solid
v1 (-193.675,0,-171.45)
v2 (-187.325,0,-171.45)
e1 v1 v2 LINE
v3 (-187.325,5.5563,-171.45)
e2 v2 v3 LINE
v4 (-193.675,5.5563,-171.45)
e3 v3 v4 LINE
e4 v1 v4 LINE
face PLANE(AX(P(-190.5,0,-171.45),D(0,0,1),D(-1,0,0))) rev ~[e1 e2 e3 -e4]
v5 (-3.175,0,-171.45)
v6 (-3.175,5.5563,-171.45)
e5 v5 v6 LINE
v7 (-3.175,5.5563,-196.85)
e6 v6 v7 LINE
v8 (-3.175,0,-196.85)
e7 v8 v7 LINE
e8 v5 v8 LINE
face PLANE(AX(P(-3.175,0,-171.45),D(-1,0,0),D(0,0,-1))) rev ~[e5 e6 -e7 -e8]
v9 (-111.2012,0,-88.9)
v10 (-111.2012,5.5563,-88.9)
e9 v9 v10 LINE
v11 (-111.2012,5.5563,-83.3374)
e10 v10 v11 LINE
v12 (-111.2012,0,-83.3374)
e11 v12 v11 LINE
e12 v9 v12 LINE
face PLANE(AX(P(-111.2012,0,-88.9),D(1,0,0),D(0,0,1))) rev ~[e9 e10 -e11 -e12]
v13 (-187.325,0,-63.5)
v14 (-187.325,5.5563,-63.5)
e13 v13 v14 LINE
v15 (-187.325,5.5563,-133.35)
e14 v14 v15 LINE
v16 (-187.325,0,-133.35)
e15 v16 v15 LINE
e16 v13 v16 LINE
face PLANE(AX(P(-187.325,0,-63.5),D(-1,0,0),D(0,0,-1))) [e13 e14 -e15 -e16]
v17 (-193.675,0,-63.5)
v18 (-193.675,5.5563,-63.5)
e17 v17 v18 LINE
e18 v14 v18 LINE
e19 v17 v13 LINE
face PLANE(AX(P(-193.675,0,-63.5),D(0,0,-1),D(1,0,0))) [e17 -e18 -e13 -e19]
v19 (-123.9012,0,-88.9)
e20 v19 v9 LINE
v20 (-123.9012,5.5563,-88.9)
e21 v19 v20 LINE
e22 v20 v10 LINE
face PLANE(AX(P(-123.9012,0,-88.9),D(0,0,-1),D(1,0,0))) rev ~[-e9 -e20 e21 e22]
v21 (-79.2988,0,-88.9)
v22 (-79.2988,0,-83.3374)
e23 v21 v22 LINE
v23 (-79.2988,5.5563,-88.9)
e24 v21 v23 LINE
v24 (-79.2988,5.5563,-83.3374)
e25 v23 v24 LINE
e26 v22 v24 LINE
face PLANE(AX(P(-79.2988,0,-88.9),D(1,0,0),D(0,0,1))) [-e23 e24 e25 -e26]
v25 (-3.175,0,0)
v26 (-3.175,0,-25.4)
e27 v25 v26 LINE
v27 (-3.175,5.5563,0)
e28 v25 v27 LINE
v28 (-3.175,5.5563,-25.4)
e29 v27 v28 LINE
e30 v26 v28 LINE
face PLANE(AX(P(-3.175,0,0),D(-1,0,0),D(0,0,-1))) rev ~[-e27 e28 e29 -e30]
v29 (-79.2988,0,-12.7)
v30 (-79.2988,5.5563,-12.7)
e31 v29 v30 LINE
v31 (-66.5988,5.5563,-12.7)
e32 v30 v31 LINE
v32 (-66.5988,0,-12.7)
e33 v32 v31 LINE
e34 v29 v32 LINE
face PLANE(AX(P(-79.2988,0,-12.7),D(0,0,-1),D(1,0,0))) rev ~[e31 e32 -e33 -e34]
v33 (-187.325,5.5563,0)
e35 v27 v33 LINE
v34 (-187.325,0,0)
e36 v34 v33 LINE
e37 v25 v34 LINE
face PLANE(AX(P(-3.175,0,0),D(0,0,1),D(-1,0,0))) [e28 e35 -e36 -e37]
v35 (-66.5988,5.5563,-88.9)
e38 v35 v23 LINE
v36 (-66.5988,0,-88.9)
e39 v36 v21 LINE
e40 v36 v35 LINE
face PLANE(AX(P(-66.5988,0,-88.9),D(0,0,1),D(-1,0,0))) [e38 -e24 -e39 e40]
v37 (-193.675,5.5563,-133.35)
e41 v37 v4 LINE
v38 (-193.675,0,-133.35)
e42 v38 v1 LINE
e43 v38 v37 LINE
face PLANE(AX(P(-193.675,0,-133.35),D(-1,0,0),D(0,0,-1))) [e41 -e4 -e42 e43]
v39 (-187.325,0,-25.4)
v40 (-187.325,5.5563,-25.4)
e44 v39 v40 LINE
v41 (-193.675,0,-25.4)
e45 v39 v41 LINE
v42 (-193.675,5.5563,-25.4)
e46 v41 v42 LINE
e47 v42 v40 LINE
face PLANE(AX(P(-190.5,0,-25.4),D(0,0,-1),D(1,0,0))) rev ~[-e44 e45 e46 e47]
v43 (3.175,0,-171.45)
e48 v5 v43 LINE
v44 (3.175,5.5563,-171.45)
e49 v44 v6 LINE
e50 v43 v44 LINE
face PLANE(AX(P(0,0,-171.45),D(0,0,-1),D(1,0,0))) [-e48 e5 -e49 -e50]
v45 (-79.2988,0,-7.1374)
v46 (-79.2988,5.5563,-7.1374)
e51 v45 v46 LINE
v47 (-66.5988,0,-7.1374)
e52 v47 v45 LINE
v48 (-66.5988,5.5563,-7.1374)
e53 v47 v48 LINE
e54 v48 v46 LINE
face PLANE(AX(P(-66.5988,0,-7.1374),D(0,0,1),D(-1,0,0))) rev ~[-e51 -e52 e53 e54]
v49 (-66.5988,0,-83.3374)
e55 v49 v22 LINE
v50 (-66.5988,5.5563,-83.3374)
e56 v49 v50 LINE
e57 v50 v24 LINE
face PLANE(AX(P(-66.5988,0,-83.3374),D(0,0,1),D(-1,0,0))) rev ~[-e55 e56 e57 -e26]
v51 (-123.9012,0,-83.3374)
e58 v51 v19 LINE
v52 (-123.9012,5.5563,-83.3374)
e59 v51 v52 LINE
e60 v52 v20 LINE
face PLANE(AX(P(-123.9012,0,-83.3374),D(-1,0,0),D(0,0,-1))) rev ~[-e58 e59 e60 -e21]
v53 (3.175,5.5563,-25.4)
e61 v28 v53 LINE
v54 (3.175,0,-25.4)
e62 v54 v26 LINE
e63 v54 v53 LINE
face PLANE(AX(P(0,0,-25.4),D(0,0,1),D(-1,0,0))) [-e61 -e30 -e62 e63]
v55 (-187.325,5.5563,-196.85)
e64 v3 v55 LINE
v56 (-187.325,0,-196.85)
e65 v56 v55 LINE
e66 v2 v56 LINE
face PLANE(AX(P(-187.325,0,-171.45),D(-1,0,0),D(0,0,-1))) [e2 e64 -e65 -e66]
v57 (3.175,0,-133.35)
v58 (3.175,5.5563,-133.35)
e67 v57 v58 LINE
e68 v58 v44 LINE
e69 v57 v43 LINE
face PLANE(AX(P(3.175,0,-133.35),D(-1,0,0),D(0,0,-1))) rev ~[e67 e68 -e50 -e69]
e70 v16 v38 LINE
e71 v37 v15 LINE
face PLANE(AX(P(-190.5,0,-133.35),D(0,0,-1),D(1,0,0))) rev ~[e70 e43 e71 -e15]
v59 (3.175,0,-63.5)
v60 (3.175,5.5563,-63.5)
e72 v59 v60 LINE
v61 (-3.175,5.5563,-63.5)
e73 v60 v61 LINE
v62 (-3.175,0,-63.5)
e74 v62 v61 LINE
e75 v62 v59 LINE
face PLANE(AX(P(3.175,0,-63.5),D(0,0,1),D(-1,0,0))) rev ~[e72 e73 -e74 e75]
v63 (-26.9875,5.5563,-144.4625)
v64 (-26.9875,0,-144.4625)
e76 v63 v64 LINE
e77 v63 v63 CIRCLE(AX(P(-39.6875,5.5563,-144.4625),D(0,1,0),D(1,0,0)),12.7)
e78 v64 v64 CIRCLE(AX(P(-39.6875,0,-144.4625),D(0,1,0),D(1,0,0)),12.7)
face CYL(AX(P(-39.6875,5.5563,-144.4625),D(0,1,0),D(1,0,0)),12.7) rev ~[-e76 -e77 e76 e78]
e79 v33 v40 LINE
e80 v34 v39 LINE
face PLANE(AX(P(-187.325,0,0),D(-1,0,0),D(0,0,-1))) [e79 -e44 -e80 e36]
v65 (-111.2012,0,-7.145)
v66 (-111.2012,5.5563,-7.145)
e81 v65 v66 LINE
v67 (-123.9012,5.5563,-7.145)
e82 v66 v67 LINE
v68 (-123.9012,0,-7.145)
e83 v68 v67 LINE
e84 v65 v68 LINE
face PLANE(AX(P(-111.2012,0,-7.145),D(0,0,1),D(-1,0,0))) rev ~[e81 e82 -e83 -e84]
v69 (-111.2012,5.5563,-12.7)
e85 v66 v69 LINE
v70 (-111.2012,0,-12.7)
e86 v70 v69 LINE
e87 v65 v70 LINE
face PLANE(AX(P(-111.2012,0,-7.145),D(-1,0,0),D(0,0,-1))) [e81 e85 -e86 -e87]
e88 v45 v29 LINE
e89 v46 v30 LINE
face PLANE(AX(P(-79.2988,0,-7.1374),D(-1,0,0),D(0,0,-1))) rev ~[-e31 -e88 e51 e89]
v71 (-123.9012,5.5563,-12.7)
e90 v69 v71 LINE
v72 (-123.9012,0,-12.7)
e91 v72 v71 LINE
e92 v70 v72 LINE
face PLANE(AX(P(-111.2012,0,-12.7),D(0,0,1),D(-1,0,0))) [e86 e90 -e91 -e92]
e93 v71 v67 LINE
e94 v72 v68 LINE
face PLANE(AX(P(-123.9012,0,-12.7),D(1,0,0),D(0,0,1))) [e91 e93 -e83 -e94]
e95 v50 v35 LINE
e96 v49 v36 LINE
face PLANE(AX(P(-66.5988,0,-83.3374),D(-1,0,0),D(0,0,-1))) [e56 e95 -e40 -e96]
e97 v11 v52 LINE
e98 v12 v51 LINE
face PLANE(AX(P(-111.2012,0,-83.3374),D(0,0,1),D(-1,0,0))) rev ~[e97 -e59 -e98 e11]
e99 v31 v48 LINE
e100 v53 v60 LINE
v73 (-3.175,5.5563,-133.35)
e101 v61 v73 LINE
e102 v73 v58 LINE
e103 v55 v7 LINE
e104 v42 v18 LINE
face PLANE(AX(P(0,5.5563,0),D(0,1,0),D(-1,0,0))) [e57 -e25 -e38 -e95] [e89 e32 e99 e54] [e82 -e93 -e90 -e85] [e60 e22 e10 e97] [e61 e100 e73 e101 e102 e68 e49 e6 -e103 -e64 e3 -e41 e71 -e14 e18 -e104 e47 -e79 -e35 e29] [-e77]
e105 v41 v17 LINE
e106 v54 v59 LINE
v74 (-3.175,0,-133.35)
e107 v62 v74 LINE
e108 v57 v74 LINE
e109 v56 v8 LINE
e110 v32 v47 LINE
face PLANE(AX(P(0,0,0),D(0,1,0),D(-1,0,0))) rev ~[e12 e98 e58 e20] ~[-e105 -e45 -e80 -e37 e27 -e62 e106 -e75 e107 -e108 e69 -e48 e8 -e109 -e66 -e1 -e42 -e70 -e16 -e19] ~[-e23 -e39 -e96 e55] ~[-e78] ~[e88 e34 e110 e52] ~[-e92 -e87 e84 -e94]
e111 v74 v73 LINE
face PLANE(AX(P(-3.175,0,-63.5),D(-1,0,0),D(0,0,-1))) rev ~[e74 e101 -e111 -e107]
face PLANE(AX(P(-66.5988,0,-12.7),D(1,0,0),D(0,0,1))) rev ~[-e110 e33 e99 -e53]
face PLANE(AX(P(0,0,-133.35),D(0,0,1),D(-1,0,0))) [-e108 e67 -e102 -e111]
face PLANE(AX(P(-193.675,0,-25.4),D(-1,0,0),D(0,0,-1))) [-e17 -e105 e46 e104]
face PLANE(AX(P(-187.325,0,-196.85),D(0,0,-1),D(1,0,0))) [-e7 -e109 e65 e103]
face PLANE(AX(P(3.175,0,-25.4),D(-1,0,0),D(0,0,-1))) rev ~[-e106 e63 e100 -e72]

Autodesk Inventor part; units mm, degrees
ref_plane "YZ Plane" through (0, 0, 0) normal (1, 0, 0) x (0, 1, 0)
ref_plane "XZ Plane" through (0, 0, 0) normal (0, 1, 0) x (-1, 0, 0)
ref_plane "XY Plane" through (0, 0, 0) normal (0, 0, 1) x (1, 0, 0)
sketch "Sketch1" plane through (0, 0, 0) normal (0, 1, 0) x (-1, 0, 0)
  line L0 (3.175, 0) -> (187.325, 0)
  line L1 (187.325, -196.85) -> (3.175, -196.85)
  line L2 (111.2012, -7.145) -> (111.2012, -12.7)
  line L3 (111.2012, -12.7) -> (123.9012, -12.7)
  line L4 (123.9012, -12.7) -> (123.9012, -7.145)
  line L5 (79.2988, -7.1374) -> (79.2988, -12.7)
  line L6 (79.2988, -12.7) -> (66.5988, -12.7)
  line L7 (66.5988, -12.7) -> (66.5988, -7.1374)
  line L8 (66.5988, -88.9) -> (79.2988, -88.9)
  line L9 (79.2988, -88.9) -> (79.2988, -83.3374)
  line L10 (66.5988, -83.3374) -> (66.5988, -88.9)
  line L11 (123.9012, -88.9) -> (111.2012, -88.9)
  line L12 (111.2012, -88.9) -> (111.2012, -83.3374)
  line L13 (123.9012, -83.3374) -> (123.9012, -88.9)
  line L14 (190.5, -25.4) -> (193.675, -25.4)
  line L15 (193.675, -63.5) -> (190.5, -63.5)
  line L16 (0, -25.4) -> (-3.175, -25.4)
  line L17 (-3.175, -63.5) -> (0, -63.5)
  line L18 (190.5, -171.45) -> (193.675, -171.45)
  line L19 (193.675, -133.35) -> (190.5, -133.35)
  line L20 (0, -171.45) -> (-3.175, -171.45)
  line L21 (-3.175, -133.35) -> (0, -133.35)
  line L22 (190.5, -171.45) -> (193.675, -171.45)
  line L23 (190.5, -25.4) -> (187.325, -25.4)
  line L24 (190.5, -63.5) -> (187.325, -63.5)
  line L25 (190.5, -133.35) -> (187.325, -133.35)
  line L26 (190.5, -171.45) -> (187.325, -171.45)
  line L27 (193.675, -25.4) -> (193.675, -63.5)
  line L28 (193.675, -133.35) -> (193.675, -171.45)
  line L29 (187.325, -171.45) -> (187.325, -196.85)
  line L30 (187.325, 0) -> (187.325, -25.4)
  line L31 (187.325, -63.5) -> (187.325, -133.35)
  line L32 (0, -171.45) -> (3.175, -171.45)
  line L33 (0, -133.35) -> (3.175, -133.35)
  line L34 (0, -63.5) -> (3.175, -63.5)
  line L35 (0, -25.4) -> (3.175, -25.4)
  line L36 (-3.175, -25.4) -> (-3.175, -63.5)
  line L37 (-3.175, -133.35) -> (-3.175, -171.45)
  line L38 (3.175, 0) -> (3.175, -25.4)
  line L39 (3.175, -63.5) -> (3.175, -133.35)
  line L40 (3.175, -171.45) -> (3.175, -196.85)
  line L41 (123.9012, -12.7) -> (111.2012, -12.7)
  line L42 (111.2012, -12.7) -> (111.2012, -7.145)
  line L43 (111.2012, -7.145) -> (123.9012, -7.145)
  line L44 (123.9012, -7.145) -> (123.9012, -12.7)
  line L45 (123.9012, -88.9) -> (111.2012, -88.9)
  line L46 (111.2012, -88.9) -> (111.2012, -83.3374)
  line L47 (111.2012, -83.3374) -> (123.9012, -83.3374)
  line L48 (123.9012, -83.3374) -> (123.9012, -88.9)
  line L49 (79.2988, -12.7) -> (66.5988, -12.7)
  line L50 (66.5988, -12.7) -> (66.5988, -7.1374)
  line L51 (66.5988, -7.1374) -> (79.2988, -7.1374)
  line L52 (79.2988, -7.1374) -> (79.2988, -12.7)
  line L53 (79.2988, -88.9) -> (66.5988, -88.9)
  line L54 (66.5988, -88.9) -> (66.5988, -83.3374)
  line L55 (66.5988, -83.3374) -> (79.2988, -83.3374)
  line L56 (79.2988, -83.3374) -> (79.2988, -88.9)
  point P0 (0, 0)
  dimension "d4" = 12.7
  dimension "d6" = 12.7
  dimension "d29" = 5.555
  dimension "d31" = 5.5626
extrude "Extrusion1" add sketch "Sketch1" along normal blind 5.5563
sketch "Sketch2" plane through (0, 5.5563, 0) normal (0, 1, 0) x (1, 0, 0)
  circle A0 centre (-39.6875, 144.4625) radius 12.7
  point P0 (0, 0)
extrude "Extrusion2" cut sketch "Sketch2" against normal blind 6.35
properties part number "mid_floor"
